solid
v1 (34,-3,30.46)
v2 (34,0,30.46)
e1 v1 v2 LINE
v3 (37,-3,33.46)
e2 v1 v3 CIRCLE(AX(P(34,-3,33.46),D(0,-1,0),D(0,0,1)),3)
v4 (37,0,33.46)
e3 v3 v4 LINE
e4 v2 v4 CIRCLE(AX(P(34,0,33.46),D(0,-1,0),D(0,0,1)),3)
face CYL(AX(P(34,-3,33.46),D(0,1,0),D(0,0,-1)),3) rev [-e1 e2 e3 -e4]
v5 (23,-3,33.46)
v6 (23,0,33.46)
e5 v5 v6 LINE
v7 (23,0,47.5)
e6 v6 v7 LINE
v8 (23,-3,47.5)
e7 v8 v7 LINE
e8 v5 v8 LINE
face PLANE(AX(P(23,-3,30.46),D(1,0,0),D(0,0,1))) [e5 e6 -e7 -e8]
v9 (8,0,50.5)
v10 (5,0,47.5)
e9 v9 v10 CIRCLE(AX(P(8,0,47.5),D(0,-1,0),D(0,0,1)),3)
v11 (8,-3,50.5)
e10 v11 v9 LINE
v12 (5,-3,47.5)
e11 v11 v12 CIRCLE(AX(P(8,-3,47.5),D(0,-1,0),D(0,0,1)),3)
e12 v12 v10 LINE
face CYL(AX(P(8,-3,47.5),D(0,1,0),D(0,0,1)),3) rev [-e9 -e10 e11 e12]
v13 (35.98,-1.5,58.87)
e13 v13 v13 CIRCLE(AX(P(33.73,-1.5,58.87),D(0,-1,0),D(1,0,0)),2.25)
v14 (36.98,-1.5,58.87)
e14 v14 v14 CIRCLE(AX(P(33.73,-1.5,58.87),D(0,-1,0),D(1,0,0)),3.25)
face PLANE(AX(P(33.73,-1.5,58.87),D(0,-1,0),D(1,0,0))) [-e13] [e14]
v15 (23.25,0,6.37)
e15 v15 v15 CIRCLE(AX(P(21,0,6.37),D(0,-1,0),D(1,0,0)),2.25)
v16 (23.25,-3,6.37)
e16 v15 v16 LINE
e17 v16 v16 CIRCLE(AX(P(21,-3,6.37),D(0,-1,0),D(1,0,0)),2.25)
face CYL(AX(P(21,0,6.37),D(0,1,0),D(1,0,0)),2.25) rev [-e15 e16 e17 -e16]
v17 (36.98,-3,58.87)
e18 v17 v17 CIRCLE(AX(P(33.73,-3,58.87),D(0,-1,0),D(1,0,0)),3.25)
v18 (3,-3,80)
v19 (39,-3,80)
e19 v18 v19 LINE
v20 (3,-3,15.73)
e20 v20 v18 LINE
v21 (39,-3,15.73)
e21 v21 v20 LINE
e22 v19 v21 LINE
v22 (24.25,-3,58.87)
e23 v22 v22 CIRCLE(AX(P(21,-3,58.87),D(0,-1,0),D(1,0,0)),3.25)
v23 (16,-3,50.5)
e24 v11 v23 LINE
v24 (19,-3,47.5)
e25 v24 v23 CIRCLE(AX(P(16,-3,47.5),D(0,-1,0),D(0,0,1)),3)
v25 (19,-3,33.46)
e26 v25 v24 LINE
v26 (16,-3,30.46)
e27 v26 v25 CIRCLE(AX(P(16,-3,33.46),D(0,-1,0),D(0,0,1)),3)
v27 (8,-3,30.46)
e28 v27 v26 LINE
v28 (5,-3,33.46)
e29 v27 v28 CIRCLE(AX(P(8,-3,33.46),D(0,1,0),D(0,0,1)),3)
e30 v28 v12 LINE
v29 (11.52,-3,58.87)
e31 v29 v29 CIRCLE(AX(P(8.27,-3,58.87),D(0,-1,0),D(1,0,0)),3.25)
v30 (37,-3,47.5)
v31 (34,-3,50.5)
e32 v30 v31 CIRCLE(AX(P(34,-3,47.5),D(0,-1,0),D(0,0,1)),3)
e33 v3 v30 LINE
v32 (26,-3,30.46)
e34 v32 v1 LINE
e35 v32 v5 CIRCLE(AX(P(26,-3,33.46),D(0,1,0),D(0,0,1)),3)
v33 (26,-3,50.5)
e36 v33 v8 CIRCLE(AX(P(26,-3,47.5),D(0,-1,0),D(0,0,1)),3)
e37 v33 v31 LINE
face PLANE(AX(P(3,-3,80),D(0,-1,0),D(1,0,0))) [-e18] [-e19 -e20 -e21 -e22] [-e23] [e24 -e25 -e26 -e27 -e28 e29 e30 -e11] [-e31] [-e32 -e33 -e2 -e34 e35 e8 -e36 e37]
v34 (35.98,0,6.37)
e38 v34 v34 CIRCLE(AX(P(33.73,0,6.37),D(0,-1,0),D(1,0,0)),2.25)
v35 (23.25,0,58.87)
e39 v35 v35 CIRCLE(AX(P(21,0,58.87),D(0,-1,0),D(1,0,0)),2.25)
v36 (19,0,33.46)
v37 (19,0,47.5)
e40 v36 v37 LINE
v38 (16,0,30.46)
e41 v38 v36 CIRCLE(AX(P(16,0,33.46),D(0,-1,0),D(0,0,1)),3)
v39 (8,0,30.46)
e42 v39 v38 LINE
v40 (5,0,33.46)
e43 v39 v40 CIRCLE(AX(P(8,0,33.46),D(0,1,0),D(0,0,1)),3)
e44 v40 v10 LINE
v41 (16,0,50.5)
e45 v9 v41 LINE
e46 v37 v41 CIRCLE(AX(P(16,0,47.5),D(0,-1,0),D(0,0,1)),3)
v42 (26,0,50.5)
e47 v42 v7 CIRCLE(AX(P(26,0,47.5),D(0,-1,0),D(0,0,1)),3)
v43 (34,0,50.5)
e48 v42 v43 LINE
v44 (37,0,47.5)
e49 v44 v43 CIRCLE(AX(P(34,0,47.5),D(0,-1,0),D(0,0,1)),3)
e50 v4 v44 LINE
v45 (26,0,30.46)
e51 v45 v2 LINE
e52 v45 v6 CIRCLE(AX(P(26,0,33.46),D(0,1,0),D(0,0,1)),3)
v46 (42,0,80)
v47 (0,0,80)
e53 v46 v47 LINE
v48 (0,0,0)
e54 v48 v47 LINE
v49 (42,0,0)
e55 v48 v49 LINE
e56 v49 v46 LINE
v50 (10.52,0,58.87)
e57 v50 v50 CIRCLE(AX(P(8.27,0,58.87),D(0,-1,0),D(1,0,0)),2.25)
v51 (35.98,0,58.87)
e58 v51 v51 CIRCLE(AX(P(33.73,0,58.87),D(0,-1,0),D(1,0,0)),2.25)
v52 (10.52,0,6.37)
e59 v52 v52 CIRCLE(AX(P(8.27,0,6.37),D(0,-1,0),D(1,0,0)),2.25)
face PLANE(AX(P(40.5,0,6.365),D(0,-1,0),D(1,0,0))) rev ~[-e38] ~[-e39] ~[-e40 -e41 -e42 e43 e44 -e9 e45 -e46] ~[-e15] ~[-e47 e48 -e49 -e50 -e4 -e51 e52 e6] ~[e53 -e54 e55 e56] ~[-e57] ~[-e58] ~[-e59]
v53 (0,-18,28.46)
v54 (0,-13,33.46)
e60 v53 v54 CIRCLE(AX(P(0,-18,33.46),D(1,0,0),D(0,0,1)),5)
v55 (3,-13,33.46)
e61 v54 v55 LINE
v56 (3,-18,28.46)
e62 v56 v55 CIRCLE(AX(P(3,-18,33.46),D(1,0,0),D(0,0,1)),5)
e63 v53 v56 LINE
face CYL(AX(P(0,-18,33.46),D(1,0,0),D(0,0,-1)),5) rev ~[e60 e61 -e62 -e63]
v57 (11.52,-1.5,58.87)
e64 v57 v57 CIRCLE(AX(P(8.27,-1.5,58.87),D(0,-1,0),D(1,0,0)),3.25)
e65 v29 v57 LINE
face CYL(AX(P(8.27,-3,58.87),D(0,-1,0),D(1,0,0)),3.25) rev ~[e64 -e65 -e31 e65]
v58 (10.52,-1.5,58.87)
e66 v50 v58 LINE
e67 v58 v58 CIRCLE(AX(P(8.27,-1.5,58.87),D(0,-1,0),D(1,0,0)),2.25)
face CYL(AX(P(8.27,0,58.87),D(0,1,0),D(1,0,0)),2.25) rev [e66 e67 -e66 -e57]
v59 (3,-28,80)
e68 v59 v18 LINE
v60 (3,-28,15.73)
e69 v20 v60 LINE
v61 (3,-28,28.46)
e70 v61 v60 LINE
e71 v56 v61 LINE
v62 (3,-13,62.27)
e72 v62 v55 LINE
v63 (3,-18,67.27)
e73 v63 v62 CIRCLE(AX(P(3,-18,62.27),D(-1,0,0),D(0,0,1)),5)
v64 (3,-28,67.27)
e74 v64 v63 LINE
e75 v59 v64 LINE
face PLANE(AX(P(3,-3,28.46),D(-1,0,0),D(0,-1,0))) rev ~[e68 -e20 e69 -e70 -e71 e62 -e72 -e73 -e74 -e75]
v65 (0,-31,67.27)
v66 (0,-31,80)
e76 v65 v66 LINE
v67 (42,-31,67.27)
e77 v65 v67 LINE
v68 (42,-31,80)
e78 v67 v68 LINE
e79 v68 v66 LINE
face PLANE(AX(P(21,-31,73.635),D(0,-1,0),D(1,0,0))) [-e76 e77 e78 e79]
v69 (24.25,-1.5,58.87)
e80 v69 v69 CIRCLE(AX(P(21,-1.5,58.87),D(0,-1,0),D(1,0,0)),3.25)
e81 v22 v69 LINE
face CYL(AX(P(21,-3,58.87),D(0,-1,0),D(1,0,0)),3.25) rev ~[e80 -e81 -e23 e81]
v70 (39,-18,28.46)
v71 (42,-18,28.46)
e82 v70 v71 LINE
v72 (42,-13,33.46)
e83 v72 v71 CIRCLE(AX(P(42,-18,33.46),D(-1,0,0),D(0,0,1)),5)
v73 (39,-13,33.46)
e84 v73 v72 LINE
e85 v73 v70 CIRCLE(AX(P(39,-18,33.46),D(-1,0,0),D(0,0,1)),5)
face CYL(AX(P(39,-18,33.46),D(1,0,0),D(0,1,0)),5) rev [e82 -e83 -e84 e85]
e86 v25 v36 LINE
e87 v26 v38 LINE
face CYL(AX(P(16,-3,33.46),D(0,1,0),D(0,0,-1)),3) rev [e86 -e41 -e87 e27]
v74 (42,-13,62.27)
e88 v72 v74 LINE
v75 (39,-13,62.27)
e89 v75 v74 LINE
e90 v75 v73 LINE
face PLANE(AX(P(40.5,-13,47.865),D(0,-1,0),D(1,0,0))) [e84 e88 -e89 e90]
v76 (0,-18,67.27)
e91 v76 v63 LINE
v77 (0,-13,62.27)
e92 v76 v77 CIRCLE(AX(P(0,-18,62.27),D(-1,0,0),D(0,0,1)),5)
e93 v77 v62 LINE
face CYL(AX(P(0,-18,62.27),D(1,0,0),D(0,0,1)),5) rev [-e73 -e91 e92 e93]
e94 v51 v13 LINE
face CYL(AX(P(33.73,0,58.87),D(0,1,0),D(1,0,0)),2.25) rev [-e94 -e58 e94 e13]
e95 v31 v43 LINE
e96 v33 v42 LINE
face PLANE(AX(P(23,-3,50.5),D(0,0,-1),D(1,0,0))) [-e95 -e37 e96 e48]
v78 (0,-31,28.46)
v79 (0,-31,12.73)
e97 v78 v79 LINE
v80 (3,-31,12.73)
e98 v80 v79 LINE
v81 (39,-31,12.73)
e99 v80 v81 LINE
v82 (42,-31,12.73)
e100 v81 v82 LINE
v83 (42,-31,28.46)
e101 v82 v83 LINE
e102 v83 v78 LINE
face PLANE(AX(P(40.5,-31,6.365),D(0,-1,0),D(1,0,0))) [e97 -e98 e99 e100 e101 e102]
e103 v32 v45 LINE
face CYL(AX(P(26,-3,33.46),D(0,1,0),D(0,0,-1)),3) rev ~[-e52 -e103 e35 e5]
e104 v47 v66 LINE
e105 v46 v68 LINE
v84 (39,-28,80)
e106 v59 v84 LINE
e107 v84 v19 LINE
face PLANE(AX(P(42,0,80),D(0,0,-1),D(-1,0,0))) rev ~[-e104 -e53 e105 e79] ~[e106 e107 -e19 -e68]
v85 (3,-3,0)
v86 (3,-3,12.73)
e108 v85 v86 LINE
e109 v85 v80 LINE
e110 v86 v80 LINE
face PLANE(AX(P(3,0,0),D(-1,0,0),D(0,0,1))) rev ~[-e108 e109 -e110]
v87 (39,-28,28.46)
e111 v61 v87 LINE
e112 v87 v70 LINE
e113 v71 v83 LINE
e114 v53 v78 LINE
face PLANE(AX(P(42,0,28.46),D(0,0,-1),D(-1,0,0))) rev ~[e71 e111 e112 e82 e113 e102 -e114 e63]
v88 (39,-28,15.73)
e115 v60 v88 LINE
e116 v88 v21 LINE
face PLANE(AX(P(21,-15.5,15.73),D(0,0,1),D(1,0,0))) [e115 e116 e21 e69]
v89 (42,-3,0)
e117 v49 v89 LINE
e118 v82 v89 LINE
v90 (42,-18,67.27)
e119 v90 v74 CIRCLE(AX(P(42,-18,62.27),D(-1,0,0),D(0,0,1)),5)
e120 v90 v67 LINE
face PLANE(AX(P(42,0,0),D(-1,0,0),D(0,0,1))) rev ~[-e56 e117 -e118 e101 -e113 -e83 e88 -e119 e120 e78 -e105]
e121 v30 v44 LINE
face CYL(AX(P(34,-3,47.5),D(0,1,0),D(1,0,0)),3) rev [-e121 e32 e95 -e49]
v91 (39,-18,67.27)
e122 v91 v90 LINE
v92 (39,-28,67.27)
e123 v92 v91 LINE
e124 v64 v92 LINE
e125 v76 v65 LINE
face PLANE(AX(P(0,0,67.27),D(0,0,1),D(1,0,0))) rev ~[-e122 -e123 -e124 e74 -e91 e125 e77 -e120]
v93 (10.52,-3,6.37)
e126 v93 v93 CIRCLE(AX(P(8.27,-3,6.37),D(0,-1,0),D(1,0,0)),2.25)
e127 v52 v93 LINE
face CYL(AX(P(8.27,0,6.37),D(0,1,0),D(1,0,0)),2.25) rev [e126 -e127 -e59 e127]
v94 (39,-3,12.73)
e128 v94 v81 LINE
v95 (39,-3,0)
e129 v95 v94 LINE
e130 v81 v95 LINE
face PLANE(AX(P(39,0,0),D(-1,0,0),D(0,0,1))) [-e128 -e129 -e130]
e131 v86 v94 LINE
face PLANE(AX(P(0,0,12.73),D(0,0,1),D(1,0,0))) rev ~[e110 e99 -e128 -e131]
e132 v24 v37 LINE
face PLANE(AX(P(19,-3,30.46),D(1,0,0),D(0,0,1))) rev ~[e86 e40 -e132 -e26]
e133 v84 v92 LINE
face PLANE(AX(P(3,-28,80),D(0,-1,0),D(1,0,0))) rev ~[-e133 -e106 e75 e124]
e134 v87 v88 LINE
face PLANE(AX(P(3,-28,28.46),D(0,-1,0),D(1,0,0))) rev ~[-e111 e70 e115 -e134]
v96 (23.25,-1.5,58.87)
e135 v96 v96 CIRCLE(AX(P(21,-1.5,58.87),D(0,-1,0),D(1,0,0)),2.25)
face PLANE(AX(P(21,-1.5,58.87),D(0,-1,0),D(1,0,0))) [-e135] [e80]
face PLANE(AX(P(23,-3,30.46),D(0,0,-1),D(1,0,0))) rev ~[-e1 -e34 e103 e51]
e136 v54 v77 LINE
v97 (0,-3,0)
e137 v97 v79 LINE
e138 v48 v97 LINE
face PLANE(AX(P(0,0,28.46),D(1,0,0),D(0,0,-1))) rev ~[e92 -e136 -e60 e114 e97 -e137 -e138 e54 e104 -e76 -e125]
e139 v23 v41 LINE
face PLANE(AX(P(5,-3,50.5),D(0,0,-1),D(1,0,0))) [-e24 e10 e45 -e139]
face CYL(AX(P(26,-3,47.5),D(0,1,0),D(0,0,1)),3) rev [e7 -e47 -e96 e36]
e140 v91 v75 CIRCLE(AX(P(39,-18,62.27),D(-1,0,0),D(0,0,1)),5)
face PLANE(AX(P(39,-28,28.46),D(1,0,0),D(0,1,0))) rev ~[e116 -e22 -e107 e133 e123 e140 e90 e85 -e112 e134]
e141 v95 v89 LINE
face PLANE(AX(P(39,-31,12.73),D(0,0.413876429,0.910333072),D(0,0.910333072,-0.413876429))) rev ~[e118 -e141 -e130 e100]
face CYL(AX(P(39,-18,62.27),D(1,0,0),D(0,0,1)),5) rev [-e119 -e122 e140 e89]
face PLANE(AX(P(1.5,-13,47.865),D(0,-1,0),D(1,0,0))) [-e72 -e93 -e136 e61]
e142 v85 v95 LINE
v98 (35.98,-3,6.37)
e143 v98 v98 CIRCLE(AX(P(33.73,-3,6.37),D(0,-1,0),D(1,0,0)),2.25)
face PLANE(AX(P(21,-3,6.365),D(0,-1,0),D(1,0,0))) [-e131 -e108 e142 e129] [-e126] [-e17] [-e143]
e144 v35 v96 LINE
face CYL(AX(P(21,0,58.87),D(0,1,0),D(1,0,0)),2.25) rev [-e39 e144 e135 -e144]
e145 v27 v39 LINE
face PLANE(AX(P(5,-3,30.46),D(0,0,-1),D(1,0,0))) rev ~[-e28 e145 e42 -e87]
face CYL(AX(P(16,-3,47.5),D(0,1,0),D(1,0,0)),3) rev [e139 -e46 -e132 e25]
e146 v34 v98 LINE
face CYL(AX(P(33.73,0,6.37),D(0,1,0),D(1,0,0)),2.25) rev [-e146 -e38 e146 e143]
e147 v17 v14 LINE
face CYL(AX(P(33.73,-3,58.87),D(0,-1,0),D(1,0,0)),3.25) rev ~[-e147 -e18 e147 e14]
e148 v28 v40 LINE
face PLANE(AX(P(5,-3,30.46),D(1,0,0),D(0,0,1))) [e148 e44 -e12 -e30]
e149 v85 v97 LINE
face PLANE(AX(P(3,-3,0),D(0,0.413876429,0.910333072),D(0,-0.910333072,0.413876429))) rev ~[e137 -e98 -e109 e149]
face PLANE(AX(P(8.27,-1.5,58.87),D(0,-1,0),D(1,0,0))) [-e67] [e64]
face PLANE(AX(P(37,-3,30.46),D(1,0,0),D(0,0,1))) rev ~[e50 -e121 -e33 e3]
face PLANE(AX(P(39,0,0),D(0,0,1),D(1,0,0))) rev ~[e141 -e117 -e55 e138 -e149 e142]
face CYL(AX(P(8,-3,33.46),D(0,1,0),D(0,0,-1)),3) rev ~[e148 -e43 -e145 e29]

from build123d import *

# Parameters (mm, degrees)
F0_W      = 36
F0_H      = 12.73
F0_W_2    = 3
F1_DEPTH  = 31
F0_H_2    = 38.81
F2_DEPTH  = 13
F0_R      = 2.25
F3_DEPTH  = 3
F4_DEPTH  = 3
F5_DEPTH  = 31
F7_DEPTH  = 12.73
F8_W      = 36
F8_H      = 25
F9_DEPTH  = 25
F11_DEPTH = 25
F13_DEPTH = 25
F14_R     = 3.25
F14_R_2   = 2.25
F15_DEPTH = 1.5
F16_W     = 14
F16_H     = 20.04
F17_DEPTH = 25
F18_R     = 3
F19_R     = 5


# Not quite as in the source:
# - a feature names something its author has since deleted; it is built from what else it names


with BuildPart() as f1:
    # F0 (on Front) → F1 (new body)
    with BuildSketch(Plane.XZ):
        with Locations((21, 73.635)):
            Rectangle(F0_W, F0_H)
        with Locations((1.5, 73.635)):
            Rectangle(F0_W_2, F0_H)
        with Locations((40.5, 73.635)):
            Rectangle(F0_W_2, F0_H)
    extrude(amount=F1_DEPTH)



with BuildPart() as f1b:
    # F0 (on Front) → F1, piece 2 (new body)
    with BuildSketch(Plane.XZ):
        with Locations((40.5, 22.095)):
            Rectangle(F0_W_2, F0_H)
        with Locations((21, 22.095)):
            Rectangle(F0_W, F0_H)
        with Locations((1.5, 22.095)):
            Rectangle(F0_W_2, F0_H)
        Polygon((0, 15.73), (0, 12.73), (3, 12.73), (39, 12.73), (42, 12.73), (42, 15.73), (39, 15.73), (3, 15.73), align=None)
    extrude(amount=F1_DEPTH)


with BuildPart() as f1_1:
    add(f1.part)

    add(f1b.part)  # F2 merges F1b
    # F0 (on Front) → F2 (join)
    with BuildSketch(Plane.XZ):
        with Locations((40.5, 47.865)):
            Rectangle(F0_W_2, F0_H_2)
        with Locations((1.5, 47.865)):
            Rectangle(F0_W_2, F0_H_2)
    extrude(amount=F2_DEPTH)

    # F0 (on Front) → F3 (join)
    with BuildSketch(Plane.XZ):
        with Locations((21, 6.365)):
            Rectangle(F0_W, F0_H)
        with Locations((8.27, 6.37)):
            Circle(F0_R, mode=Mode.SUBTRACT)
        with Locations((21, 6.37)):
            Circle(F0_R, mode=Mode.SUBTRACT)
        with Locations((33.73, 6.37)):
            Circle(F0_R, mode=Mode.SUBTRACT)
    extrude(amount=F3_DEPTH)

    # F0 (on Front) → F4 (join)
    with BuildSketch(Plane.XZ):
        with Locations((21, 47.865)):
            Rectangle(F0_W, F0_H_2)
        with Locations((8.27, 58.87)):
            Circle(F0_R, mode=Mode.SUBTRACT)
        with Locations((21, 58.87)):
            Circle(F0_R, mode=Mode.SUBTRACT)
        with Locations((33.73, 58.87)):
            Circle(F0_R, mode=Mode.SUBTRACT)
    extrude(amount=F4_DEPTH)

    # F0 (on Front) → F5 (join)
    with BuildSketch(Plane.XZ):
        with Locations((40.5, 6.365)):
            Rectangle(F0_W_2, F0_H)
        with Locations((1.5, 6.365)):
            Rectangle(F0_W_2, F0_H)
    extrude(amount=F5_DEPTH)

    # F6 (on face) → F7 (cut)
    with BuildSketch(Plane.XY.offset(28.46)):
        Polygon((39, -3), (3, -3), (3, -13), (3, -28), (39, -28), (39, -13), align=None)
    extrude(amount=-F7_DEPTH, mode=Mode.SUBTRACT)

    # F8 (on face) → F9 (cut)
    with BuildSketch(Plane.XY.offset(80)):
        with Locations((21, -15.5)):
            Rectangle(F8_W, F8_H)
    extrude(amount=-F9_DEPTH, mode=Mode.SUBTRACT)

    # F10 (on face) → F11 (cut)
    with BuildSketch(Plane.YZ.offset(3)):
        Polygon((-3, 0), (-31, 12.73), (-31, 0), align=None)
    extrude(amount=-F11_DEPTH, mode=Mode.SUBTRACT)

    # F12 (on face) → F13 (cut)
    with BuildSketch(Plane(origin=(39, 0, 0), x_dir=(0, -1, 0), z_dir=(-1, 0, 0))):
        Polygon((31, 0), (31, 12.73), (3, 0), align=None)
    extrude(amount=-F13_DEPTH, mode=Mode.SUBTRACT)

    # F14 (on face) → F15 (cut)
    with BuildSketch(Plane.XZ.offset(3)):
        with Locations((8.27, 58.87)):
            Circle(F14_R)
        with Locations((8.27, 58.87)):
            Circle(F14_R_2, mode=Mode.SUBTRACT)
        with Locations((21, 58.87)):
            Circle(F14_R)
        with Locations((21, 58.87)):
            Circle(F14_R_2, mode=Mode.SUBTRACT)
        with Locations((33.73, 58.87)):
            Circle(F14_R)
        with Locations((33.73, 58.87)):
            Circle(F14_R_2, mode=Mode.SUBTRACT)
    extrude(amount=-F15_DEPTH, mode=Mode.SUBTRACT)

    # F16 (on face) → F17 (cut)
    with BuildSketch(Plane.XZ.offset(3)):
        with Locations((12, 40.48)):
            Rectangle(F16_W, F16_H)
        with Locations((30, 40.48)):
            Rectangle(F16_W, F16_H)
    extrude(amount=-F17_DEPTH, mode=Mode.SUBTRACT)

    # F18
    f18_edges = [f1_1.edges().sort_by_distance(p)[0] for p in [
        (5, -1.5, 50.5),
        (5, -1.5, 30.46),
        (37, -1.5, 30.46),
        (23, -1.5, 30.46),
        (19, -1.5, 30.46),
        (19, -1.5, 50.5),
        (23, -1.5, 50.5),
        (37, -1.5, 50.5),
    ]]
    fillet(f18_edges, radius=F18_R)

    # F19
    f19_edges = [f1_1.edges().sort_by_distance(p)[0] for p in [
        (1.5, -13, 67.27),
        (40.5, -13, 67.27),
        (1.5, -13, 28.46),
        (40.5, -13, 28.46),
    ]]
    fillet(f19_edges, radius=F19_R)


solid = f1_1.part
